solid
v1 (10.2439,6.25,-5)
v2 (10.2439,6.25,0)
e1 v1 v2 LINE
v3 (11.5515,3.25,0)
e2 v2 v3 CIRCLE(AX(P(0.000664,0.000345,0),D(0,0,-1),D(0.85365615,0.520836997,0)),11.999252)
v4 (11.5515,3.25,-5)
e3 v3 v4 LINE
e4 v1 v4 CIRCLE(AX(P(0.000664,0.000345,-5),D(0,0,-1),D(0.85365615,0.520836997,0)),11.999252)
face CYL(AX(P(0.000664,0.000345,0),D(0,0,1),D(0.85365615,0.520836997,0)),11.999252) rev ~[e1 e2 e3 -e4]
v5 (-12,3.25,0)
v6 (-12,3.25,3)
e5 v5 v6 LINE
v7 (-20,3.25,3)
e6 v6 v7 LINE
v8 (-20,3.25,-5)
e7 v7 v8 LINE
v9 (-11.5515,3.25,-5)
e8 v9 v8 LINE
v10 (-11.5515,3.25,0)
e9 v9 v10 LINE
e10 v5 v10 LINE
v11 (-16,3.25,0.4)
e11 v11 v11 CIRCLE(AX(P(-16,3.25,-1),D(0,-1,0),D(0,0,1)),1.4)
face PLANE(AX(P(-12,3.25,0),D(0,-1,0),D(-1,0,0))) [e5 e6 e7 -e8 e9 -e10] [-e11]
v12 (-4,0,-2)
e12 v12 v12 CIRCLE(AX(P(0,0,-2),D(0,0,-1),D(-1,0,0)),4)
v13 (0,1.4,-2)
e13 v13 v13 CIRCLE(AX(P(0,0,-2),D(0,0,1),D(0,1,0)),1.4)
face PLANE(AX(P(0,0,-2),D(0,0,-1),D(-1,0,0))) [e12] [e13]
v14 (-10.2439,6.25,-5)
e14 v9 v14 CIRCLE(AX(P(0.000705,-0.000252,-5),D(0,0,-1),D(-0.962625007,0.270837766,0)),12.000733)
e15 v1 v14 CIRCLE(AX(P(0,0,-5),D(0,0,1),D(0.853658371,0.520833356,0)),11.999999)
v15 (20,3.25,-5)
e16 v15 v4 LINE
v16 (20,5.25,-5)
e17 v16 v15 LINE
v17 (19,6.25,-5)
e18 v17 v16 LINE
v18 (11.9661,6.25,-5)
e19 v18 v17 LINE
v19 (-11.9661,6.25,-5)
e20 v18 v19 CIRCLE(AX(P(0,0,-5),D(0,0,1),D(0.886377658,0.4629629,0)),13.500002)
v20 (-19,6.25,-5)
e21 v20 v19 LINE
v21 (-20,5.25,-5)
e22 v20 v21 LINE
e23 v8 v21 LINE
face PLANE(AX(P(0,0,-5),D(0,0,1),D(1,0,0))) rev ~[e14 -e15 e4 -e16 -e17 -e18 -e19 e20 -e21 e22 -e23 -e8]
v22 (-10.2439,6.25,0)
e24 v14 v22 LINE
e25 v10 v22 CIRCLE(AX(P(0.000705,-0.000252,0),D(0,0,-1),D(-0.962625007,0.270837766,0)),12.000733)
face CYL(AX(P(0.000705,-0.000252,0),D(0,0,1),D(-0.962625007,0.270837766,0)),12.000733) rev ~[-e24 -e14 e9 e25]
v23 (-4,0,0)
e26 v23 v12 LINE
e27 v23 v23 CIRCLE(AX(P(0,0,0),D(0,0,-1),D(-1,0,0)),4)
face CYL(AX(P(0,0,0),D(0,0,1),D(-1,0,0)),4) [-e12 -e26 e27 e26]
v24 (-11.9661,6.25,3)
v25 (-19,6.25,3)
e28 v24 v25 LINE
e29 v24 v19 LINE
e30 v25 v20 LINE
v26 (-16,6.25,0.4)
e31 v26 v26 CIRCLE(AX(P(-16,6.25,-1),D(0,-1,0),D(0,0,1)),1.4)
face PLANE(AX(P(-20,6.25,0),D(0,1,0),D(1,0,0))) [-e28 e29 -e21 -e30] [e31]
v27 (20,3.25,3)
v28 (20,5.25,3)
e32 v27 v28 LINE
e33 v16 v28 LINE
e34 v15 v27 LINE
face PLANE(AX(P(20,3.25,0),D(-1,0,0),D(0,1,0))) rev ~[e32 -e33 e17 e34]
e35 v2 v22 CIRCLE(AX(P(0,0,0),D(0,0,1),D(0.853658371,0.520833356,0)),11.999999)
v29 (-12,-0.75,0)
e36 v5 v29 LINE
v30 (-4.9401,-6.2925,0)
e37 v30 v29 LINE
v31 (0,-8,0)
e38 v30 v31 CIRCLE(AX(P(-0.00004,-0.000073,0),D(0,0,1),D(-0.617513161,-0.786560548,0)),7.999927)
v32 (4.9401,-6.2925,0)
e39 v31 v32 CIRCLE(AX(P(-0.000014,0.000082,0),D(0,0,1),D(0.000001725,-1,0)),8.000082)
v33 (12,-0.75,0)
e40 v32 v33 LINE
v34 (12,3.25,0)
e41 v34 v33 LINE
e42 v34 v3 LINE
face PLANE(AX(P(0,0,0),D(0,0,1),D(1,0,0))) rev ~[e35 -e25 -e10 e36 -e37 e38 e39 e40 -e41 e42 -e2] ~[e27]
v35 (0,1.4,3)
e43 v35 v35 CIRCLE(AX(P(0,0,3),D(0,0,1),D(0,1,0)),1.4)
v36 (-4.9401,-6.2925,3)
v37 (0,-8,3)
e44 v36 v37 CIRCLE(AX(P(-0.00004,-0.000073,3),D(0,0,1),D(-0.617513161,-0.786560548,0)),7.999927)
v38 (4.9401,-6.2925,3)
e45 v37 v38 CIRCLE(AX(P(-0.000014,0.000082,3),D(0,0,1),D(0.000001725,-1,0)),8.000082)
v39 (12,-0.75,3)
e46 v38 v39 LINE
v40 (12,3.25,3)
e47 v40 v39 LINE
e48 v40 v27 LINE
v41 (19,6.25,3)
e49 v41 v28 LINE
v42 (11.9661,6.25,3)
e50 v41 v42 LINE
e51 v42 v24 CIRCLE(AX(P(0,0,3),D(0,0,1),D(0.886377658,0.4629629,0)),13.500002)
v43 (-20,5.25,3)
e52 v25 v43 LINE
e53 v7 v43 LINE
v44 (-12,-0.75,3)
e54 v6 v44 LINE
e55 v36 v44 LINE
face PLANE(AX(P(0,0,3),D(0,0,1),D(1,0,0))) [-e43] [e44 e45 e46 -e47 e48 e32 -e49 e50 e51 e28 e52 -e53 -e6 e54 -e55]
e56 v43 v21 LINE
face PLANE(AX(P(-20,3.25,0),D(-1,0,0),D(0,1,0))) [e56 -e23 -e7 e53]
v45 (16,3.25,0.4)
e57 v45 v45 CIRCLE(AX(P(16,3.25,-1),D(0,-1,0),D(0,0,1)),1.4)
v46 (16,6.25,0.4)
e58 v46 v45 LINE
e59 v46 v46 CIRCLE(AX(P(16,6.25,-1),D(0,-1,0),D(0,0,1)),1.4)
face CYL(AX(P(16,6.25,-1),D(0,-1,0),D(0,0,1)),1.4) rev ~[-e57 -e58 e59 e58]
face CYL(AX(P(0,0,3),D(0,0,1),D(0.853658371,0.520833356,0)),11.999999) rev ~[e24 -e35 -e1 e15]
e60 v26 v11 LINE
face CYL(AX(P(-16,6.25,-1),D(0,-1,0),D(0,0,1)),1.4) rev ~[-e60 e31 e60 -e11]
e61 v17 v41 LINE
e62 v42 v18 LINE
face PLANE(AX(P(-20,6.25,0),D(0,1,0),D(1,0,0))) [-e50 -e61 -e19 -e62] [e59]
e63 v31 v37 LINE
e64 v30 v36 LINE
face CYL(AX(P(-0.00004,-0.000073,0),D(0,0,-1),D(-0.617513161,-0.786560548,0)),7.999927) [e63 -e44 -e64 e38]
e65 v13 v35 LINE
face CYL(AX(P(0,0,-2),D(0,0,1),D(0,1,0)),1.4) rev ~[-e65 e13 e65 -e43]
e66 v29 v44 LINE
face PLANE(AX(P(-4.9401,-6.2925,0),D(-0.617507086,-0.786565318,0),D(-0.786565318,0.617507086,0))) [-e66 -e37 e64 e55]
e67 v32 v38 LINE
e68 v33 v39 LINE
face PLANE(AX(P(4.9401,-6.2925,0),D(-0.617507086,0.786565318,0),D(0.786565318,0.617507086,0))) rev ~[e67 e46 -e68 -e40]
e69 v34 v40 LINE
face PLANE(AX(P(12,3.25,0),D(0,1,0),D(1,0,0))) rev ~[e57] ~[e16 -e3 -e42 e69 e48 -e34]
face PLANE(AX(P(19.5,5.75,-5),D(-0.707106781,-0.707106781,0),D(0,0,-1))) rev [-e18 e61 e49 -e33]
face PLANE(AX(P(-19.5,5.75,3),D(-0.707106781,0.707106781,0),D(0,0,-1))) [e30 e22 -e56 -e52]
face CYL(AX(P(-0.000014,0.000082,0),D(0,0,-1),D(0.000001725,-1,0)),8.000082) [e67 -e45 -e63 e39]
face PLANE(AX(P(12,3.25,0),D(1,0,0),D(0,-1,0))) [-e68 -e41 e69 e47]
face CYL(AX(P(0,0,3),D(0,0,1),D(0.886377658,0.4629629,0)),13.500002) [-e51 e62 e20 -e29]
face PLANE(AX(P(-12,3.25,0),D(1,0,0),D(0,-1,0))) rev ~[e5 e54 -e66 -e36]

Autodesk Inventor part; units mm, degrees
ref_plane "YZ Plane" through (0, 0, 0) normal (1, 0, 0) x (0, 1, 0)
ref_plane "XZ Plane" through (0, 0, 0) normal (0, 1, 0) x (-1, 0, 0)
ref_plane "XY Plane" through (0, 0, 0) normal (0, 0, 1) x (1, 0, 0)
sketch "Эскиз1" plane through (0, 0, 0) normal (0, 0, 1) x (1, 0, 0)
  circle A0 centre (0, 0) radius 10.75 construction
  line L0 (-40.1576, -0.75) -> (35.328, -0.75) construction
  line L1 (-40.1576, 3.25) -> (35.328, 3.25) construction
  line L2 (-12, 3.25) -> (-20, 3.25)
  line L3 (-20, 3.25) -> (-20, 6.25)
  line L4 (-20, 6.25) -> (0, 6.25)
  line L5 (0, 6.25) -> (0, -8)
  arc A1 (-4.9401, -6.2925) -> (0, -8) centre (0, 0) ccw
  line L6 (12, 3.25) -> (20, 3.25)
  line L7 (20, 3.25) -> (20, 6.25)
  line L8 (20, 6.25) -> (0, 6.25)
  arc A2 (0, -8) -> (4.9401, -6.2925) centre (0, 0) ccw
  line L9 (12, 3.25) -> (12, -0.75)
  line L10 (-12, 3.25) -> (-12, -0.75)
  line L11 (-4.9401, -6.2925) -> (-12, -0.75)
  line L12 (4.9401, -6.2925) -> (12, -0.75)
  dimension "d1" = 21.5
  dimension "d2" = 0.75
  dimension "d3" = 4
  dimension "d4" = 8
  dimension "d5" = 3
  dimension "d6" = 24
  dimension "d7" = 40
extrude "Выдавливание1" add sketch "Эскиз1" along normal blind 3
sketch "Эскиз2" plane through (0, 0, 0) normal (0, 0, -1) x (-1, 0, 0)
  arc A0 (-4.9401, -6.2925) -> (4.9401, -6.2925) centre (0, 0) ccw projected
  circle A1 centre (0, 0) radius 4
  line L0 (-20, 6.25) -> (20, 6.25) projected
  line L1 (-12, 3.25) -> (-20, 3.25) projected
  line L2 (-20, 3.25) -> (-20, 6.25) projected
  line L3 (-11.5515, 3.25) -> (-20, 3.25)
  line L4 (-20, 3.25) -> (-20, 6.25)
  line L5 (-20, 6.25) -> (-10.2439, 6.25)
  line L6 (10.2439, 6.25) -> (20, 6.25)
  line L7 (20, 6.25) -> (20, 3.25) projected
  line L8 (20, 6.25) -> (20, 3.25)
  line L9 (20, 3.25) -> (11.5515, 3.25)
  arc A2 (-10.2439, 6.25) -> (-11.5515, 3.25) centre (0, 0) ccw
  arc A3 (11.5515, 3.25) -> (10.2439, 6.25) centre (0, 0) ccw
  line L10 (-20, 6.25) -> (20, 6.25) projected
  dimension "d10" = 8
  dimension "d26" = 12
extrude "Выдавливание2" add sketch "Эскиз2" along normal blind 2
sketch "Эскиз3" plane through (0, 0, -2) normal (0, 0, -1) x (-1, 0, 0)
  line L0 (-10.2439, 6.25) -> (-20, 6.25) projected
  line L1 (-20, 6.25) -> (-20, 3.25) projected
  line L2 (-20, 3.25) -> (-11.5515, 3.25) projected
  line L3 (11.5515, 3.25) -> (20, 3.25) projected
  line L4 (20, 3.25) -> (20, 6.25) projected
  arc A0 (11.5515, 3.25) -> (10.2439, 6.25) centre (0, 0) ccw projected
  line L5 (20, 6.25) -> (10.2439, 6.25) projected
  arc A1 (-10.2439, 6.25) -> (-11.5515, 3.25) centre (0, 0) ccw projected
extrude "Выдавливание3" add sketch "Эскиз3" along normal blind 3
sketch "Эскиз4" plane through (0, 0, -2) normal (0, 0, -1) x (-1, 0, 0)
  circle A0 centre (0, 0) radius 4 projected
hole "Отверстие1" at (0, 0, -2) direction (0, 0, 1) diameter 2.8 end through all
sketch "Эскиз5" plane through (0, 0, 3) normal (0, 0, 1) x (1, 0, 0)
  arc A0 (10.2439, 6.25) -> (-10.2439, 6.25) centre (0, 0) ccw
  line L0 (20, 6.25) -> (-20, 6.25) projected
  arc A1 (11.9661, 6.25) -> (-11.9661, 6.25) centre (0, 0) ccw
  line L1 (11.9661, 6.25) -> (10.2439, 6.25)
  line L2 (-10.2439, 6.25) -> (-11.9661, 6.25)
  dimension "d22" = 12
  dimension "d23" = 1.5
extrude "Выдавливание4" add sketch "Эскиз5" against normal up to surface (8 mm away) contours A0 L0 A1
sketch "Эскиз6" plane through (0, 0, 3) normal (0, 0, 1) x (1, 0, 0)
  arc A0 (10.2439, 6.25) -> (-10.2439, 6.25) centre (0, 0) ccw projected
  line L0 (10.2439, 6.25) -> (-10.2439, 6.25) projected
extrude "Выдавливание5" add sketch "Эскиз6" against normal up to surface (3 mm away)
sketch "Эскиз7" plane through (20, 6.25, 3) normal (0, 1, 0) x (1, 0, 0)
  line L0 (-40, 8) -> (-40, 0) projected
  line L1 (-31.5515, 8) -> (-8.4485, 8) projected
  line L2 (-20, 8) -> (-20, 0)
  line L3 (-24.9401, 0) -> (-15.0599, 0) projected
  point P0 (-20, 3)
  point P1 (-4, 4)
  point P2 (-36, 4)
  point P3 (-40, 4)
  dimension "d36" = 32
hole "Отверстие2" at (16, 6.25, -1) at (-16, 6.25, -1) direction (0, -1, 0) diameter 2.8 end through all
chamfer "Фаска1" distance 1 angle 45 2 edges at (20, 6.25, -1) (-20, 6.25, -1)
properties part number "smallWheelStator" material "Пластик АБС"
